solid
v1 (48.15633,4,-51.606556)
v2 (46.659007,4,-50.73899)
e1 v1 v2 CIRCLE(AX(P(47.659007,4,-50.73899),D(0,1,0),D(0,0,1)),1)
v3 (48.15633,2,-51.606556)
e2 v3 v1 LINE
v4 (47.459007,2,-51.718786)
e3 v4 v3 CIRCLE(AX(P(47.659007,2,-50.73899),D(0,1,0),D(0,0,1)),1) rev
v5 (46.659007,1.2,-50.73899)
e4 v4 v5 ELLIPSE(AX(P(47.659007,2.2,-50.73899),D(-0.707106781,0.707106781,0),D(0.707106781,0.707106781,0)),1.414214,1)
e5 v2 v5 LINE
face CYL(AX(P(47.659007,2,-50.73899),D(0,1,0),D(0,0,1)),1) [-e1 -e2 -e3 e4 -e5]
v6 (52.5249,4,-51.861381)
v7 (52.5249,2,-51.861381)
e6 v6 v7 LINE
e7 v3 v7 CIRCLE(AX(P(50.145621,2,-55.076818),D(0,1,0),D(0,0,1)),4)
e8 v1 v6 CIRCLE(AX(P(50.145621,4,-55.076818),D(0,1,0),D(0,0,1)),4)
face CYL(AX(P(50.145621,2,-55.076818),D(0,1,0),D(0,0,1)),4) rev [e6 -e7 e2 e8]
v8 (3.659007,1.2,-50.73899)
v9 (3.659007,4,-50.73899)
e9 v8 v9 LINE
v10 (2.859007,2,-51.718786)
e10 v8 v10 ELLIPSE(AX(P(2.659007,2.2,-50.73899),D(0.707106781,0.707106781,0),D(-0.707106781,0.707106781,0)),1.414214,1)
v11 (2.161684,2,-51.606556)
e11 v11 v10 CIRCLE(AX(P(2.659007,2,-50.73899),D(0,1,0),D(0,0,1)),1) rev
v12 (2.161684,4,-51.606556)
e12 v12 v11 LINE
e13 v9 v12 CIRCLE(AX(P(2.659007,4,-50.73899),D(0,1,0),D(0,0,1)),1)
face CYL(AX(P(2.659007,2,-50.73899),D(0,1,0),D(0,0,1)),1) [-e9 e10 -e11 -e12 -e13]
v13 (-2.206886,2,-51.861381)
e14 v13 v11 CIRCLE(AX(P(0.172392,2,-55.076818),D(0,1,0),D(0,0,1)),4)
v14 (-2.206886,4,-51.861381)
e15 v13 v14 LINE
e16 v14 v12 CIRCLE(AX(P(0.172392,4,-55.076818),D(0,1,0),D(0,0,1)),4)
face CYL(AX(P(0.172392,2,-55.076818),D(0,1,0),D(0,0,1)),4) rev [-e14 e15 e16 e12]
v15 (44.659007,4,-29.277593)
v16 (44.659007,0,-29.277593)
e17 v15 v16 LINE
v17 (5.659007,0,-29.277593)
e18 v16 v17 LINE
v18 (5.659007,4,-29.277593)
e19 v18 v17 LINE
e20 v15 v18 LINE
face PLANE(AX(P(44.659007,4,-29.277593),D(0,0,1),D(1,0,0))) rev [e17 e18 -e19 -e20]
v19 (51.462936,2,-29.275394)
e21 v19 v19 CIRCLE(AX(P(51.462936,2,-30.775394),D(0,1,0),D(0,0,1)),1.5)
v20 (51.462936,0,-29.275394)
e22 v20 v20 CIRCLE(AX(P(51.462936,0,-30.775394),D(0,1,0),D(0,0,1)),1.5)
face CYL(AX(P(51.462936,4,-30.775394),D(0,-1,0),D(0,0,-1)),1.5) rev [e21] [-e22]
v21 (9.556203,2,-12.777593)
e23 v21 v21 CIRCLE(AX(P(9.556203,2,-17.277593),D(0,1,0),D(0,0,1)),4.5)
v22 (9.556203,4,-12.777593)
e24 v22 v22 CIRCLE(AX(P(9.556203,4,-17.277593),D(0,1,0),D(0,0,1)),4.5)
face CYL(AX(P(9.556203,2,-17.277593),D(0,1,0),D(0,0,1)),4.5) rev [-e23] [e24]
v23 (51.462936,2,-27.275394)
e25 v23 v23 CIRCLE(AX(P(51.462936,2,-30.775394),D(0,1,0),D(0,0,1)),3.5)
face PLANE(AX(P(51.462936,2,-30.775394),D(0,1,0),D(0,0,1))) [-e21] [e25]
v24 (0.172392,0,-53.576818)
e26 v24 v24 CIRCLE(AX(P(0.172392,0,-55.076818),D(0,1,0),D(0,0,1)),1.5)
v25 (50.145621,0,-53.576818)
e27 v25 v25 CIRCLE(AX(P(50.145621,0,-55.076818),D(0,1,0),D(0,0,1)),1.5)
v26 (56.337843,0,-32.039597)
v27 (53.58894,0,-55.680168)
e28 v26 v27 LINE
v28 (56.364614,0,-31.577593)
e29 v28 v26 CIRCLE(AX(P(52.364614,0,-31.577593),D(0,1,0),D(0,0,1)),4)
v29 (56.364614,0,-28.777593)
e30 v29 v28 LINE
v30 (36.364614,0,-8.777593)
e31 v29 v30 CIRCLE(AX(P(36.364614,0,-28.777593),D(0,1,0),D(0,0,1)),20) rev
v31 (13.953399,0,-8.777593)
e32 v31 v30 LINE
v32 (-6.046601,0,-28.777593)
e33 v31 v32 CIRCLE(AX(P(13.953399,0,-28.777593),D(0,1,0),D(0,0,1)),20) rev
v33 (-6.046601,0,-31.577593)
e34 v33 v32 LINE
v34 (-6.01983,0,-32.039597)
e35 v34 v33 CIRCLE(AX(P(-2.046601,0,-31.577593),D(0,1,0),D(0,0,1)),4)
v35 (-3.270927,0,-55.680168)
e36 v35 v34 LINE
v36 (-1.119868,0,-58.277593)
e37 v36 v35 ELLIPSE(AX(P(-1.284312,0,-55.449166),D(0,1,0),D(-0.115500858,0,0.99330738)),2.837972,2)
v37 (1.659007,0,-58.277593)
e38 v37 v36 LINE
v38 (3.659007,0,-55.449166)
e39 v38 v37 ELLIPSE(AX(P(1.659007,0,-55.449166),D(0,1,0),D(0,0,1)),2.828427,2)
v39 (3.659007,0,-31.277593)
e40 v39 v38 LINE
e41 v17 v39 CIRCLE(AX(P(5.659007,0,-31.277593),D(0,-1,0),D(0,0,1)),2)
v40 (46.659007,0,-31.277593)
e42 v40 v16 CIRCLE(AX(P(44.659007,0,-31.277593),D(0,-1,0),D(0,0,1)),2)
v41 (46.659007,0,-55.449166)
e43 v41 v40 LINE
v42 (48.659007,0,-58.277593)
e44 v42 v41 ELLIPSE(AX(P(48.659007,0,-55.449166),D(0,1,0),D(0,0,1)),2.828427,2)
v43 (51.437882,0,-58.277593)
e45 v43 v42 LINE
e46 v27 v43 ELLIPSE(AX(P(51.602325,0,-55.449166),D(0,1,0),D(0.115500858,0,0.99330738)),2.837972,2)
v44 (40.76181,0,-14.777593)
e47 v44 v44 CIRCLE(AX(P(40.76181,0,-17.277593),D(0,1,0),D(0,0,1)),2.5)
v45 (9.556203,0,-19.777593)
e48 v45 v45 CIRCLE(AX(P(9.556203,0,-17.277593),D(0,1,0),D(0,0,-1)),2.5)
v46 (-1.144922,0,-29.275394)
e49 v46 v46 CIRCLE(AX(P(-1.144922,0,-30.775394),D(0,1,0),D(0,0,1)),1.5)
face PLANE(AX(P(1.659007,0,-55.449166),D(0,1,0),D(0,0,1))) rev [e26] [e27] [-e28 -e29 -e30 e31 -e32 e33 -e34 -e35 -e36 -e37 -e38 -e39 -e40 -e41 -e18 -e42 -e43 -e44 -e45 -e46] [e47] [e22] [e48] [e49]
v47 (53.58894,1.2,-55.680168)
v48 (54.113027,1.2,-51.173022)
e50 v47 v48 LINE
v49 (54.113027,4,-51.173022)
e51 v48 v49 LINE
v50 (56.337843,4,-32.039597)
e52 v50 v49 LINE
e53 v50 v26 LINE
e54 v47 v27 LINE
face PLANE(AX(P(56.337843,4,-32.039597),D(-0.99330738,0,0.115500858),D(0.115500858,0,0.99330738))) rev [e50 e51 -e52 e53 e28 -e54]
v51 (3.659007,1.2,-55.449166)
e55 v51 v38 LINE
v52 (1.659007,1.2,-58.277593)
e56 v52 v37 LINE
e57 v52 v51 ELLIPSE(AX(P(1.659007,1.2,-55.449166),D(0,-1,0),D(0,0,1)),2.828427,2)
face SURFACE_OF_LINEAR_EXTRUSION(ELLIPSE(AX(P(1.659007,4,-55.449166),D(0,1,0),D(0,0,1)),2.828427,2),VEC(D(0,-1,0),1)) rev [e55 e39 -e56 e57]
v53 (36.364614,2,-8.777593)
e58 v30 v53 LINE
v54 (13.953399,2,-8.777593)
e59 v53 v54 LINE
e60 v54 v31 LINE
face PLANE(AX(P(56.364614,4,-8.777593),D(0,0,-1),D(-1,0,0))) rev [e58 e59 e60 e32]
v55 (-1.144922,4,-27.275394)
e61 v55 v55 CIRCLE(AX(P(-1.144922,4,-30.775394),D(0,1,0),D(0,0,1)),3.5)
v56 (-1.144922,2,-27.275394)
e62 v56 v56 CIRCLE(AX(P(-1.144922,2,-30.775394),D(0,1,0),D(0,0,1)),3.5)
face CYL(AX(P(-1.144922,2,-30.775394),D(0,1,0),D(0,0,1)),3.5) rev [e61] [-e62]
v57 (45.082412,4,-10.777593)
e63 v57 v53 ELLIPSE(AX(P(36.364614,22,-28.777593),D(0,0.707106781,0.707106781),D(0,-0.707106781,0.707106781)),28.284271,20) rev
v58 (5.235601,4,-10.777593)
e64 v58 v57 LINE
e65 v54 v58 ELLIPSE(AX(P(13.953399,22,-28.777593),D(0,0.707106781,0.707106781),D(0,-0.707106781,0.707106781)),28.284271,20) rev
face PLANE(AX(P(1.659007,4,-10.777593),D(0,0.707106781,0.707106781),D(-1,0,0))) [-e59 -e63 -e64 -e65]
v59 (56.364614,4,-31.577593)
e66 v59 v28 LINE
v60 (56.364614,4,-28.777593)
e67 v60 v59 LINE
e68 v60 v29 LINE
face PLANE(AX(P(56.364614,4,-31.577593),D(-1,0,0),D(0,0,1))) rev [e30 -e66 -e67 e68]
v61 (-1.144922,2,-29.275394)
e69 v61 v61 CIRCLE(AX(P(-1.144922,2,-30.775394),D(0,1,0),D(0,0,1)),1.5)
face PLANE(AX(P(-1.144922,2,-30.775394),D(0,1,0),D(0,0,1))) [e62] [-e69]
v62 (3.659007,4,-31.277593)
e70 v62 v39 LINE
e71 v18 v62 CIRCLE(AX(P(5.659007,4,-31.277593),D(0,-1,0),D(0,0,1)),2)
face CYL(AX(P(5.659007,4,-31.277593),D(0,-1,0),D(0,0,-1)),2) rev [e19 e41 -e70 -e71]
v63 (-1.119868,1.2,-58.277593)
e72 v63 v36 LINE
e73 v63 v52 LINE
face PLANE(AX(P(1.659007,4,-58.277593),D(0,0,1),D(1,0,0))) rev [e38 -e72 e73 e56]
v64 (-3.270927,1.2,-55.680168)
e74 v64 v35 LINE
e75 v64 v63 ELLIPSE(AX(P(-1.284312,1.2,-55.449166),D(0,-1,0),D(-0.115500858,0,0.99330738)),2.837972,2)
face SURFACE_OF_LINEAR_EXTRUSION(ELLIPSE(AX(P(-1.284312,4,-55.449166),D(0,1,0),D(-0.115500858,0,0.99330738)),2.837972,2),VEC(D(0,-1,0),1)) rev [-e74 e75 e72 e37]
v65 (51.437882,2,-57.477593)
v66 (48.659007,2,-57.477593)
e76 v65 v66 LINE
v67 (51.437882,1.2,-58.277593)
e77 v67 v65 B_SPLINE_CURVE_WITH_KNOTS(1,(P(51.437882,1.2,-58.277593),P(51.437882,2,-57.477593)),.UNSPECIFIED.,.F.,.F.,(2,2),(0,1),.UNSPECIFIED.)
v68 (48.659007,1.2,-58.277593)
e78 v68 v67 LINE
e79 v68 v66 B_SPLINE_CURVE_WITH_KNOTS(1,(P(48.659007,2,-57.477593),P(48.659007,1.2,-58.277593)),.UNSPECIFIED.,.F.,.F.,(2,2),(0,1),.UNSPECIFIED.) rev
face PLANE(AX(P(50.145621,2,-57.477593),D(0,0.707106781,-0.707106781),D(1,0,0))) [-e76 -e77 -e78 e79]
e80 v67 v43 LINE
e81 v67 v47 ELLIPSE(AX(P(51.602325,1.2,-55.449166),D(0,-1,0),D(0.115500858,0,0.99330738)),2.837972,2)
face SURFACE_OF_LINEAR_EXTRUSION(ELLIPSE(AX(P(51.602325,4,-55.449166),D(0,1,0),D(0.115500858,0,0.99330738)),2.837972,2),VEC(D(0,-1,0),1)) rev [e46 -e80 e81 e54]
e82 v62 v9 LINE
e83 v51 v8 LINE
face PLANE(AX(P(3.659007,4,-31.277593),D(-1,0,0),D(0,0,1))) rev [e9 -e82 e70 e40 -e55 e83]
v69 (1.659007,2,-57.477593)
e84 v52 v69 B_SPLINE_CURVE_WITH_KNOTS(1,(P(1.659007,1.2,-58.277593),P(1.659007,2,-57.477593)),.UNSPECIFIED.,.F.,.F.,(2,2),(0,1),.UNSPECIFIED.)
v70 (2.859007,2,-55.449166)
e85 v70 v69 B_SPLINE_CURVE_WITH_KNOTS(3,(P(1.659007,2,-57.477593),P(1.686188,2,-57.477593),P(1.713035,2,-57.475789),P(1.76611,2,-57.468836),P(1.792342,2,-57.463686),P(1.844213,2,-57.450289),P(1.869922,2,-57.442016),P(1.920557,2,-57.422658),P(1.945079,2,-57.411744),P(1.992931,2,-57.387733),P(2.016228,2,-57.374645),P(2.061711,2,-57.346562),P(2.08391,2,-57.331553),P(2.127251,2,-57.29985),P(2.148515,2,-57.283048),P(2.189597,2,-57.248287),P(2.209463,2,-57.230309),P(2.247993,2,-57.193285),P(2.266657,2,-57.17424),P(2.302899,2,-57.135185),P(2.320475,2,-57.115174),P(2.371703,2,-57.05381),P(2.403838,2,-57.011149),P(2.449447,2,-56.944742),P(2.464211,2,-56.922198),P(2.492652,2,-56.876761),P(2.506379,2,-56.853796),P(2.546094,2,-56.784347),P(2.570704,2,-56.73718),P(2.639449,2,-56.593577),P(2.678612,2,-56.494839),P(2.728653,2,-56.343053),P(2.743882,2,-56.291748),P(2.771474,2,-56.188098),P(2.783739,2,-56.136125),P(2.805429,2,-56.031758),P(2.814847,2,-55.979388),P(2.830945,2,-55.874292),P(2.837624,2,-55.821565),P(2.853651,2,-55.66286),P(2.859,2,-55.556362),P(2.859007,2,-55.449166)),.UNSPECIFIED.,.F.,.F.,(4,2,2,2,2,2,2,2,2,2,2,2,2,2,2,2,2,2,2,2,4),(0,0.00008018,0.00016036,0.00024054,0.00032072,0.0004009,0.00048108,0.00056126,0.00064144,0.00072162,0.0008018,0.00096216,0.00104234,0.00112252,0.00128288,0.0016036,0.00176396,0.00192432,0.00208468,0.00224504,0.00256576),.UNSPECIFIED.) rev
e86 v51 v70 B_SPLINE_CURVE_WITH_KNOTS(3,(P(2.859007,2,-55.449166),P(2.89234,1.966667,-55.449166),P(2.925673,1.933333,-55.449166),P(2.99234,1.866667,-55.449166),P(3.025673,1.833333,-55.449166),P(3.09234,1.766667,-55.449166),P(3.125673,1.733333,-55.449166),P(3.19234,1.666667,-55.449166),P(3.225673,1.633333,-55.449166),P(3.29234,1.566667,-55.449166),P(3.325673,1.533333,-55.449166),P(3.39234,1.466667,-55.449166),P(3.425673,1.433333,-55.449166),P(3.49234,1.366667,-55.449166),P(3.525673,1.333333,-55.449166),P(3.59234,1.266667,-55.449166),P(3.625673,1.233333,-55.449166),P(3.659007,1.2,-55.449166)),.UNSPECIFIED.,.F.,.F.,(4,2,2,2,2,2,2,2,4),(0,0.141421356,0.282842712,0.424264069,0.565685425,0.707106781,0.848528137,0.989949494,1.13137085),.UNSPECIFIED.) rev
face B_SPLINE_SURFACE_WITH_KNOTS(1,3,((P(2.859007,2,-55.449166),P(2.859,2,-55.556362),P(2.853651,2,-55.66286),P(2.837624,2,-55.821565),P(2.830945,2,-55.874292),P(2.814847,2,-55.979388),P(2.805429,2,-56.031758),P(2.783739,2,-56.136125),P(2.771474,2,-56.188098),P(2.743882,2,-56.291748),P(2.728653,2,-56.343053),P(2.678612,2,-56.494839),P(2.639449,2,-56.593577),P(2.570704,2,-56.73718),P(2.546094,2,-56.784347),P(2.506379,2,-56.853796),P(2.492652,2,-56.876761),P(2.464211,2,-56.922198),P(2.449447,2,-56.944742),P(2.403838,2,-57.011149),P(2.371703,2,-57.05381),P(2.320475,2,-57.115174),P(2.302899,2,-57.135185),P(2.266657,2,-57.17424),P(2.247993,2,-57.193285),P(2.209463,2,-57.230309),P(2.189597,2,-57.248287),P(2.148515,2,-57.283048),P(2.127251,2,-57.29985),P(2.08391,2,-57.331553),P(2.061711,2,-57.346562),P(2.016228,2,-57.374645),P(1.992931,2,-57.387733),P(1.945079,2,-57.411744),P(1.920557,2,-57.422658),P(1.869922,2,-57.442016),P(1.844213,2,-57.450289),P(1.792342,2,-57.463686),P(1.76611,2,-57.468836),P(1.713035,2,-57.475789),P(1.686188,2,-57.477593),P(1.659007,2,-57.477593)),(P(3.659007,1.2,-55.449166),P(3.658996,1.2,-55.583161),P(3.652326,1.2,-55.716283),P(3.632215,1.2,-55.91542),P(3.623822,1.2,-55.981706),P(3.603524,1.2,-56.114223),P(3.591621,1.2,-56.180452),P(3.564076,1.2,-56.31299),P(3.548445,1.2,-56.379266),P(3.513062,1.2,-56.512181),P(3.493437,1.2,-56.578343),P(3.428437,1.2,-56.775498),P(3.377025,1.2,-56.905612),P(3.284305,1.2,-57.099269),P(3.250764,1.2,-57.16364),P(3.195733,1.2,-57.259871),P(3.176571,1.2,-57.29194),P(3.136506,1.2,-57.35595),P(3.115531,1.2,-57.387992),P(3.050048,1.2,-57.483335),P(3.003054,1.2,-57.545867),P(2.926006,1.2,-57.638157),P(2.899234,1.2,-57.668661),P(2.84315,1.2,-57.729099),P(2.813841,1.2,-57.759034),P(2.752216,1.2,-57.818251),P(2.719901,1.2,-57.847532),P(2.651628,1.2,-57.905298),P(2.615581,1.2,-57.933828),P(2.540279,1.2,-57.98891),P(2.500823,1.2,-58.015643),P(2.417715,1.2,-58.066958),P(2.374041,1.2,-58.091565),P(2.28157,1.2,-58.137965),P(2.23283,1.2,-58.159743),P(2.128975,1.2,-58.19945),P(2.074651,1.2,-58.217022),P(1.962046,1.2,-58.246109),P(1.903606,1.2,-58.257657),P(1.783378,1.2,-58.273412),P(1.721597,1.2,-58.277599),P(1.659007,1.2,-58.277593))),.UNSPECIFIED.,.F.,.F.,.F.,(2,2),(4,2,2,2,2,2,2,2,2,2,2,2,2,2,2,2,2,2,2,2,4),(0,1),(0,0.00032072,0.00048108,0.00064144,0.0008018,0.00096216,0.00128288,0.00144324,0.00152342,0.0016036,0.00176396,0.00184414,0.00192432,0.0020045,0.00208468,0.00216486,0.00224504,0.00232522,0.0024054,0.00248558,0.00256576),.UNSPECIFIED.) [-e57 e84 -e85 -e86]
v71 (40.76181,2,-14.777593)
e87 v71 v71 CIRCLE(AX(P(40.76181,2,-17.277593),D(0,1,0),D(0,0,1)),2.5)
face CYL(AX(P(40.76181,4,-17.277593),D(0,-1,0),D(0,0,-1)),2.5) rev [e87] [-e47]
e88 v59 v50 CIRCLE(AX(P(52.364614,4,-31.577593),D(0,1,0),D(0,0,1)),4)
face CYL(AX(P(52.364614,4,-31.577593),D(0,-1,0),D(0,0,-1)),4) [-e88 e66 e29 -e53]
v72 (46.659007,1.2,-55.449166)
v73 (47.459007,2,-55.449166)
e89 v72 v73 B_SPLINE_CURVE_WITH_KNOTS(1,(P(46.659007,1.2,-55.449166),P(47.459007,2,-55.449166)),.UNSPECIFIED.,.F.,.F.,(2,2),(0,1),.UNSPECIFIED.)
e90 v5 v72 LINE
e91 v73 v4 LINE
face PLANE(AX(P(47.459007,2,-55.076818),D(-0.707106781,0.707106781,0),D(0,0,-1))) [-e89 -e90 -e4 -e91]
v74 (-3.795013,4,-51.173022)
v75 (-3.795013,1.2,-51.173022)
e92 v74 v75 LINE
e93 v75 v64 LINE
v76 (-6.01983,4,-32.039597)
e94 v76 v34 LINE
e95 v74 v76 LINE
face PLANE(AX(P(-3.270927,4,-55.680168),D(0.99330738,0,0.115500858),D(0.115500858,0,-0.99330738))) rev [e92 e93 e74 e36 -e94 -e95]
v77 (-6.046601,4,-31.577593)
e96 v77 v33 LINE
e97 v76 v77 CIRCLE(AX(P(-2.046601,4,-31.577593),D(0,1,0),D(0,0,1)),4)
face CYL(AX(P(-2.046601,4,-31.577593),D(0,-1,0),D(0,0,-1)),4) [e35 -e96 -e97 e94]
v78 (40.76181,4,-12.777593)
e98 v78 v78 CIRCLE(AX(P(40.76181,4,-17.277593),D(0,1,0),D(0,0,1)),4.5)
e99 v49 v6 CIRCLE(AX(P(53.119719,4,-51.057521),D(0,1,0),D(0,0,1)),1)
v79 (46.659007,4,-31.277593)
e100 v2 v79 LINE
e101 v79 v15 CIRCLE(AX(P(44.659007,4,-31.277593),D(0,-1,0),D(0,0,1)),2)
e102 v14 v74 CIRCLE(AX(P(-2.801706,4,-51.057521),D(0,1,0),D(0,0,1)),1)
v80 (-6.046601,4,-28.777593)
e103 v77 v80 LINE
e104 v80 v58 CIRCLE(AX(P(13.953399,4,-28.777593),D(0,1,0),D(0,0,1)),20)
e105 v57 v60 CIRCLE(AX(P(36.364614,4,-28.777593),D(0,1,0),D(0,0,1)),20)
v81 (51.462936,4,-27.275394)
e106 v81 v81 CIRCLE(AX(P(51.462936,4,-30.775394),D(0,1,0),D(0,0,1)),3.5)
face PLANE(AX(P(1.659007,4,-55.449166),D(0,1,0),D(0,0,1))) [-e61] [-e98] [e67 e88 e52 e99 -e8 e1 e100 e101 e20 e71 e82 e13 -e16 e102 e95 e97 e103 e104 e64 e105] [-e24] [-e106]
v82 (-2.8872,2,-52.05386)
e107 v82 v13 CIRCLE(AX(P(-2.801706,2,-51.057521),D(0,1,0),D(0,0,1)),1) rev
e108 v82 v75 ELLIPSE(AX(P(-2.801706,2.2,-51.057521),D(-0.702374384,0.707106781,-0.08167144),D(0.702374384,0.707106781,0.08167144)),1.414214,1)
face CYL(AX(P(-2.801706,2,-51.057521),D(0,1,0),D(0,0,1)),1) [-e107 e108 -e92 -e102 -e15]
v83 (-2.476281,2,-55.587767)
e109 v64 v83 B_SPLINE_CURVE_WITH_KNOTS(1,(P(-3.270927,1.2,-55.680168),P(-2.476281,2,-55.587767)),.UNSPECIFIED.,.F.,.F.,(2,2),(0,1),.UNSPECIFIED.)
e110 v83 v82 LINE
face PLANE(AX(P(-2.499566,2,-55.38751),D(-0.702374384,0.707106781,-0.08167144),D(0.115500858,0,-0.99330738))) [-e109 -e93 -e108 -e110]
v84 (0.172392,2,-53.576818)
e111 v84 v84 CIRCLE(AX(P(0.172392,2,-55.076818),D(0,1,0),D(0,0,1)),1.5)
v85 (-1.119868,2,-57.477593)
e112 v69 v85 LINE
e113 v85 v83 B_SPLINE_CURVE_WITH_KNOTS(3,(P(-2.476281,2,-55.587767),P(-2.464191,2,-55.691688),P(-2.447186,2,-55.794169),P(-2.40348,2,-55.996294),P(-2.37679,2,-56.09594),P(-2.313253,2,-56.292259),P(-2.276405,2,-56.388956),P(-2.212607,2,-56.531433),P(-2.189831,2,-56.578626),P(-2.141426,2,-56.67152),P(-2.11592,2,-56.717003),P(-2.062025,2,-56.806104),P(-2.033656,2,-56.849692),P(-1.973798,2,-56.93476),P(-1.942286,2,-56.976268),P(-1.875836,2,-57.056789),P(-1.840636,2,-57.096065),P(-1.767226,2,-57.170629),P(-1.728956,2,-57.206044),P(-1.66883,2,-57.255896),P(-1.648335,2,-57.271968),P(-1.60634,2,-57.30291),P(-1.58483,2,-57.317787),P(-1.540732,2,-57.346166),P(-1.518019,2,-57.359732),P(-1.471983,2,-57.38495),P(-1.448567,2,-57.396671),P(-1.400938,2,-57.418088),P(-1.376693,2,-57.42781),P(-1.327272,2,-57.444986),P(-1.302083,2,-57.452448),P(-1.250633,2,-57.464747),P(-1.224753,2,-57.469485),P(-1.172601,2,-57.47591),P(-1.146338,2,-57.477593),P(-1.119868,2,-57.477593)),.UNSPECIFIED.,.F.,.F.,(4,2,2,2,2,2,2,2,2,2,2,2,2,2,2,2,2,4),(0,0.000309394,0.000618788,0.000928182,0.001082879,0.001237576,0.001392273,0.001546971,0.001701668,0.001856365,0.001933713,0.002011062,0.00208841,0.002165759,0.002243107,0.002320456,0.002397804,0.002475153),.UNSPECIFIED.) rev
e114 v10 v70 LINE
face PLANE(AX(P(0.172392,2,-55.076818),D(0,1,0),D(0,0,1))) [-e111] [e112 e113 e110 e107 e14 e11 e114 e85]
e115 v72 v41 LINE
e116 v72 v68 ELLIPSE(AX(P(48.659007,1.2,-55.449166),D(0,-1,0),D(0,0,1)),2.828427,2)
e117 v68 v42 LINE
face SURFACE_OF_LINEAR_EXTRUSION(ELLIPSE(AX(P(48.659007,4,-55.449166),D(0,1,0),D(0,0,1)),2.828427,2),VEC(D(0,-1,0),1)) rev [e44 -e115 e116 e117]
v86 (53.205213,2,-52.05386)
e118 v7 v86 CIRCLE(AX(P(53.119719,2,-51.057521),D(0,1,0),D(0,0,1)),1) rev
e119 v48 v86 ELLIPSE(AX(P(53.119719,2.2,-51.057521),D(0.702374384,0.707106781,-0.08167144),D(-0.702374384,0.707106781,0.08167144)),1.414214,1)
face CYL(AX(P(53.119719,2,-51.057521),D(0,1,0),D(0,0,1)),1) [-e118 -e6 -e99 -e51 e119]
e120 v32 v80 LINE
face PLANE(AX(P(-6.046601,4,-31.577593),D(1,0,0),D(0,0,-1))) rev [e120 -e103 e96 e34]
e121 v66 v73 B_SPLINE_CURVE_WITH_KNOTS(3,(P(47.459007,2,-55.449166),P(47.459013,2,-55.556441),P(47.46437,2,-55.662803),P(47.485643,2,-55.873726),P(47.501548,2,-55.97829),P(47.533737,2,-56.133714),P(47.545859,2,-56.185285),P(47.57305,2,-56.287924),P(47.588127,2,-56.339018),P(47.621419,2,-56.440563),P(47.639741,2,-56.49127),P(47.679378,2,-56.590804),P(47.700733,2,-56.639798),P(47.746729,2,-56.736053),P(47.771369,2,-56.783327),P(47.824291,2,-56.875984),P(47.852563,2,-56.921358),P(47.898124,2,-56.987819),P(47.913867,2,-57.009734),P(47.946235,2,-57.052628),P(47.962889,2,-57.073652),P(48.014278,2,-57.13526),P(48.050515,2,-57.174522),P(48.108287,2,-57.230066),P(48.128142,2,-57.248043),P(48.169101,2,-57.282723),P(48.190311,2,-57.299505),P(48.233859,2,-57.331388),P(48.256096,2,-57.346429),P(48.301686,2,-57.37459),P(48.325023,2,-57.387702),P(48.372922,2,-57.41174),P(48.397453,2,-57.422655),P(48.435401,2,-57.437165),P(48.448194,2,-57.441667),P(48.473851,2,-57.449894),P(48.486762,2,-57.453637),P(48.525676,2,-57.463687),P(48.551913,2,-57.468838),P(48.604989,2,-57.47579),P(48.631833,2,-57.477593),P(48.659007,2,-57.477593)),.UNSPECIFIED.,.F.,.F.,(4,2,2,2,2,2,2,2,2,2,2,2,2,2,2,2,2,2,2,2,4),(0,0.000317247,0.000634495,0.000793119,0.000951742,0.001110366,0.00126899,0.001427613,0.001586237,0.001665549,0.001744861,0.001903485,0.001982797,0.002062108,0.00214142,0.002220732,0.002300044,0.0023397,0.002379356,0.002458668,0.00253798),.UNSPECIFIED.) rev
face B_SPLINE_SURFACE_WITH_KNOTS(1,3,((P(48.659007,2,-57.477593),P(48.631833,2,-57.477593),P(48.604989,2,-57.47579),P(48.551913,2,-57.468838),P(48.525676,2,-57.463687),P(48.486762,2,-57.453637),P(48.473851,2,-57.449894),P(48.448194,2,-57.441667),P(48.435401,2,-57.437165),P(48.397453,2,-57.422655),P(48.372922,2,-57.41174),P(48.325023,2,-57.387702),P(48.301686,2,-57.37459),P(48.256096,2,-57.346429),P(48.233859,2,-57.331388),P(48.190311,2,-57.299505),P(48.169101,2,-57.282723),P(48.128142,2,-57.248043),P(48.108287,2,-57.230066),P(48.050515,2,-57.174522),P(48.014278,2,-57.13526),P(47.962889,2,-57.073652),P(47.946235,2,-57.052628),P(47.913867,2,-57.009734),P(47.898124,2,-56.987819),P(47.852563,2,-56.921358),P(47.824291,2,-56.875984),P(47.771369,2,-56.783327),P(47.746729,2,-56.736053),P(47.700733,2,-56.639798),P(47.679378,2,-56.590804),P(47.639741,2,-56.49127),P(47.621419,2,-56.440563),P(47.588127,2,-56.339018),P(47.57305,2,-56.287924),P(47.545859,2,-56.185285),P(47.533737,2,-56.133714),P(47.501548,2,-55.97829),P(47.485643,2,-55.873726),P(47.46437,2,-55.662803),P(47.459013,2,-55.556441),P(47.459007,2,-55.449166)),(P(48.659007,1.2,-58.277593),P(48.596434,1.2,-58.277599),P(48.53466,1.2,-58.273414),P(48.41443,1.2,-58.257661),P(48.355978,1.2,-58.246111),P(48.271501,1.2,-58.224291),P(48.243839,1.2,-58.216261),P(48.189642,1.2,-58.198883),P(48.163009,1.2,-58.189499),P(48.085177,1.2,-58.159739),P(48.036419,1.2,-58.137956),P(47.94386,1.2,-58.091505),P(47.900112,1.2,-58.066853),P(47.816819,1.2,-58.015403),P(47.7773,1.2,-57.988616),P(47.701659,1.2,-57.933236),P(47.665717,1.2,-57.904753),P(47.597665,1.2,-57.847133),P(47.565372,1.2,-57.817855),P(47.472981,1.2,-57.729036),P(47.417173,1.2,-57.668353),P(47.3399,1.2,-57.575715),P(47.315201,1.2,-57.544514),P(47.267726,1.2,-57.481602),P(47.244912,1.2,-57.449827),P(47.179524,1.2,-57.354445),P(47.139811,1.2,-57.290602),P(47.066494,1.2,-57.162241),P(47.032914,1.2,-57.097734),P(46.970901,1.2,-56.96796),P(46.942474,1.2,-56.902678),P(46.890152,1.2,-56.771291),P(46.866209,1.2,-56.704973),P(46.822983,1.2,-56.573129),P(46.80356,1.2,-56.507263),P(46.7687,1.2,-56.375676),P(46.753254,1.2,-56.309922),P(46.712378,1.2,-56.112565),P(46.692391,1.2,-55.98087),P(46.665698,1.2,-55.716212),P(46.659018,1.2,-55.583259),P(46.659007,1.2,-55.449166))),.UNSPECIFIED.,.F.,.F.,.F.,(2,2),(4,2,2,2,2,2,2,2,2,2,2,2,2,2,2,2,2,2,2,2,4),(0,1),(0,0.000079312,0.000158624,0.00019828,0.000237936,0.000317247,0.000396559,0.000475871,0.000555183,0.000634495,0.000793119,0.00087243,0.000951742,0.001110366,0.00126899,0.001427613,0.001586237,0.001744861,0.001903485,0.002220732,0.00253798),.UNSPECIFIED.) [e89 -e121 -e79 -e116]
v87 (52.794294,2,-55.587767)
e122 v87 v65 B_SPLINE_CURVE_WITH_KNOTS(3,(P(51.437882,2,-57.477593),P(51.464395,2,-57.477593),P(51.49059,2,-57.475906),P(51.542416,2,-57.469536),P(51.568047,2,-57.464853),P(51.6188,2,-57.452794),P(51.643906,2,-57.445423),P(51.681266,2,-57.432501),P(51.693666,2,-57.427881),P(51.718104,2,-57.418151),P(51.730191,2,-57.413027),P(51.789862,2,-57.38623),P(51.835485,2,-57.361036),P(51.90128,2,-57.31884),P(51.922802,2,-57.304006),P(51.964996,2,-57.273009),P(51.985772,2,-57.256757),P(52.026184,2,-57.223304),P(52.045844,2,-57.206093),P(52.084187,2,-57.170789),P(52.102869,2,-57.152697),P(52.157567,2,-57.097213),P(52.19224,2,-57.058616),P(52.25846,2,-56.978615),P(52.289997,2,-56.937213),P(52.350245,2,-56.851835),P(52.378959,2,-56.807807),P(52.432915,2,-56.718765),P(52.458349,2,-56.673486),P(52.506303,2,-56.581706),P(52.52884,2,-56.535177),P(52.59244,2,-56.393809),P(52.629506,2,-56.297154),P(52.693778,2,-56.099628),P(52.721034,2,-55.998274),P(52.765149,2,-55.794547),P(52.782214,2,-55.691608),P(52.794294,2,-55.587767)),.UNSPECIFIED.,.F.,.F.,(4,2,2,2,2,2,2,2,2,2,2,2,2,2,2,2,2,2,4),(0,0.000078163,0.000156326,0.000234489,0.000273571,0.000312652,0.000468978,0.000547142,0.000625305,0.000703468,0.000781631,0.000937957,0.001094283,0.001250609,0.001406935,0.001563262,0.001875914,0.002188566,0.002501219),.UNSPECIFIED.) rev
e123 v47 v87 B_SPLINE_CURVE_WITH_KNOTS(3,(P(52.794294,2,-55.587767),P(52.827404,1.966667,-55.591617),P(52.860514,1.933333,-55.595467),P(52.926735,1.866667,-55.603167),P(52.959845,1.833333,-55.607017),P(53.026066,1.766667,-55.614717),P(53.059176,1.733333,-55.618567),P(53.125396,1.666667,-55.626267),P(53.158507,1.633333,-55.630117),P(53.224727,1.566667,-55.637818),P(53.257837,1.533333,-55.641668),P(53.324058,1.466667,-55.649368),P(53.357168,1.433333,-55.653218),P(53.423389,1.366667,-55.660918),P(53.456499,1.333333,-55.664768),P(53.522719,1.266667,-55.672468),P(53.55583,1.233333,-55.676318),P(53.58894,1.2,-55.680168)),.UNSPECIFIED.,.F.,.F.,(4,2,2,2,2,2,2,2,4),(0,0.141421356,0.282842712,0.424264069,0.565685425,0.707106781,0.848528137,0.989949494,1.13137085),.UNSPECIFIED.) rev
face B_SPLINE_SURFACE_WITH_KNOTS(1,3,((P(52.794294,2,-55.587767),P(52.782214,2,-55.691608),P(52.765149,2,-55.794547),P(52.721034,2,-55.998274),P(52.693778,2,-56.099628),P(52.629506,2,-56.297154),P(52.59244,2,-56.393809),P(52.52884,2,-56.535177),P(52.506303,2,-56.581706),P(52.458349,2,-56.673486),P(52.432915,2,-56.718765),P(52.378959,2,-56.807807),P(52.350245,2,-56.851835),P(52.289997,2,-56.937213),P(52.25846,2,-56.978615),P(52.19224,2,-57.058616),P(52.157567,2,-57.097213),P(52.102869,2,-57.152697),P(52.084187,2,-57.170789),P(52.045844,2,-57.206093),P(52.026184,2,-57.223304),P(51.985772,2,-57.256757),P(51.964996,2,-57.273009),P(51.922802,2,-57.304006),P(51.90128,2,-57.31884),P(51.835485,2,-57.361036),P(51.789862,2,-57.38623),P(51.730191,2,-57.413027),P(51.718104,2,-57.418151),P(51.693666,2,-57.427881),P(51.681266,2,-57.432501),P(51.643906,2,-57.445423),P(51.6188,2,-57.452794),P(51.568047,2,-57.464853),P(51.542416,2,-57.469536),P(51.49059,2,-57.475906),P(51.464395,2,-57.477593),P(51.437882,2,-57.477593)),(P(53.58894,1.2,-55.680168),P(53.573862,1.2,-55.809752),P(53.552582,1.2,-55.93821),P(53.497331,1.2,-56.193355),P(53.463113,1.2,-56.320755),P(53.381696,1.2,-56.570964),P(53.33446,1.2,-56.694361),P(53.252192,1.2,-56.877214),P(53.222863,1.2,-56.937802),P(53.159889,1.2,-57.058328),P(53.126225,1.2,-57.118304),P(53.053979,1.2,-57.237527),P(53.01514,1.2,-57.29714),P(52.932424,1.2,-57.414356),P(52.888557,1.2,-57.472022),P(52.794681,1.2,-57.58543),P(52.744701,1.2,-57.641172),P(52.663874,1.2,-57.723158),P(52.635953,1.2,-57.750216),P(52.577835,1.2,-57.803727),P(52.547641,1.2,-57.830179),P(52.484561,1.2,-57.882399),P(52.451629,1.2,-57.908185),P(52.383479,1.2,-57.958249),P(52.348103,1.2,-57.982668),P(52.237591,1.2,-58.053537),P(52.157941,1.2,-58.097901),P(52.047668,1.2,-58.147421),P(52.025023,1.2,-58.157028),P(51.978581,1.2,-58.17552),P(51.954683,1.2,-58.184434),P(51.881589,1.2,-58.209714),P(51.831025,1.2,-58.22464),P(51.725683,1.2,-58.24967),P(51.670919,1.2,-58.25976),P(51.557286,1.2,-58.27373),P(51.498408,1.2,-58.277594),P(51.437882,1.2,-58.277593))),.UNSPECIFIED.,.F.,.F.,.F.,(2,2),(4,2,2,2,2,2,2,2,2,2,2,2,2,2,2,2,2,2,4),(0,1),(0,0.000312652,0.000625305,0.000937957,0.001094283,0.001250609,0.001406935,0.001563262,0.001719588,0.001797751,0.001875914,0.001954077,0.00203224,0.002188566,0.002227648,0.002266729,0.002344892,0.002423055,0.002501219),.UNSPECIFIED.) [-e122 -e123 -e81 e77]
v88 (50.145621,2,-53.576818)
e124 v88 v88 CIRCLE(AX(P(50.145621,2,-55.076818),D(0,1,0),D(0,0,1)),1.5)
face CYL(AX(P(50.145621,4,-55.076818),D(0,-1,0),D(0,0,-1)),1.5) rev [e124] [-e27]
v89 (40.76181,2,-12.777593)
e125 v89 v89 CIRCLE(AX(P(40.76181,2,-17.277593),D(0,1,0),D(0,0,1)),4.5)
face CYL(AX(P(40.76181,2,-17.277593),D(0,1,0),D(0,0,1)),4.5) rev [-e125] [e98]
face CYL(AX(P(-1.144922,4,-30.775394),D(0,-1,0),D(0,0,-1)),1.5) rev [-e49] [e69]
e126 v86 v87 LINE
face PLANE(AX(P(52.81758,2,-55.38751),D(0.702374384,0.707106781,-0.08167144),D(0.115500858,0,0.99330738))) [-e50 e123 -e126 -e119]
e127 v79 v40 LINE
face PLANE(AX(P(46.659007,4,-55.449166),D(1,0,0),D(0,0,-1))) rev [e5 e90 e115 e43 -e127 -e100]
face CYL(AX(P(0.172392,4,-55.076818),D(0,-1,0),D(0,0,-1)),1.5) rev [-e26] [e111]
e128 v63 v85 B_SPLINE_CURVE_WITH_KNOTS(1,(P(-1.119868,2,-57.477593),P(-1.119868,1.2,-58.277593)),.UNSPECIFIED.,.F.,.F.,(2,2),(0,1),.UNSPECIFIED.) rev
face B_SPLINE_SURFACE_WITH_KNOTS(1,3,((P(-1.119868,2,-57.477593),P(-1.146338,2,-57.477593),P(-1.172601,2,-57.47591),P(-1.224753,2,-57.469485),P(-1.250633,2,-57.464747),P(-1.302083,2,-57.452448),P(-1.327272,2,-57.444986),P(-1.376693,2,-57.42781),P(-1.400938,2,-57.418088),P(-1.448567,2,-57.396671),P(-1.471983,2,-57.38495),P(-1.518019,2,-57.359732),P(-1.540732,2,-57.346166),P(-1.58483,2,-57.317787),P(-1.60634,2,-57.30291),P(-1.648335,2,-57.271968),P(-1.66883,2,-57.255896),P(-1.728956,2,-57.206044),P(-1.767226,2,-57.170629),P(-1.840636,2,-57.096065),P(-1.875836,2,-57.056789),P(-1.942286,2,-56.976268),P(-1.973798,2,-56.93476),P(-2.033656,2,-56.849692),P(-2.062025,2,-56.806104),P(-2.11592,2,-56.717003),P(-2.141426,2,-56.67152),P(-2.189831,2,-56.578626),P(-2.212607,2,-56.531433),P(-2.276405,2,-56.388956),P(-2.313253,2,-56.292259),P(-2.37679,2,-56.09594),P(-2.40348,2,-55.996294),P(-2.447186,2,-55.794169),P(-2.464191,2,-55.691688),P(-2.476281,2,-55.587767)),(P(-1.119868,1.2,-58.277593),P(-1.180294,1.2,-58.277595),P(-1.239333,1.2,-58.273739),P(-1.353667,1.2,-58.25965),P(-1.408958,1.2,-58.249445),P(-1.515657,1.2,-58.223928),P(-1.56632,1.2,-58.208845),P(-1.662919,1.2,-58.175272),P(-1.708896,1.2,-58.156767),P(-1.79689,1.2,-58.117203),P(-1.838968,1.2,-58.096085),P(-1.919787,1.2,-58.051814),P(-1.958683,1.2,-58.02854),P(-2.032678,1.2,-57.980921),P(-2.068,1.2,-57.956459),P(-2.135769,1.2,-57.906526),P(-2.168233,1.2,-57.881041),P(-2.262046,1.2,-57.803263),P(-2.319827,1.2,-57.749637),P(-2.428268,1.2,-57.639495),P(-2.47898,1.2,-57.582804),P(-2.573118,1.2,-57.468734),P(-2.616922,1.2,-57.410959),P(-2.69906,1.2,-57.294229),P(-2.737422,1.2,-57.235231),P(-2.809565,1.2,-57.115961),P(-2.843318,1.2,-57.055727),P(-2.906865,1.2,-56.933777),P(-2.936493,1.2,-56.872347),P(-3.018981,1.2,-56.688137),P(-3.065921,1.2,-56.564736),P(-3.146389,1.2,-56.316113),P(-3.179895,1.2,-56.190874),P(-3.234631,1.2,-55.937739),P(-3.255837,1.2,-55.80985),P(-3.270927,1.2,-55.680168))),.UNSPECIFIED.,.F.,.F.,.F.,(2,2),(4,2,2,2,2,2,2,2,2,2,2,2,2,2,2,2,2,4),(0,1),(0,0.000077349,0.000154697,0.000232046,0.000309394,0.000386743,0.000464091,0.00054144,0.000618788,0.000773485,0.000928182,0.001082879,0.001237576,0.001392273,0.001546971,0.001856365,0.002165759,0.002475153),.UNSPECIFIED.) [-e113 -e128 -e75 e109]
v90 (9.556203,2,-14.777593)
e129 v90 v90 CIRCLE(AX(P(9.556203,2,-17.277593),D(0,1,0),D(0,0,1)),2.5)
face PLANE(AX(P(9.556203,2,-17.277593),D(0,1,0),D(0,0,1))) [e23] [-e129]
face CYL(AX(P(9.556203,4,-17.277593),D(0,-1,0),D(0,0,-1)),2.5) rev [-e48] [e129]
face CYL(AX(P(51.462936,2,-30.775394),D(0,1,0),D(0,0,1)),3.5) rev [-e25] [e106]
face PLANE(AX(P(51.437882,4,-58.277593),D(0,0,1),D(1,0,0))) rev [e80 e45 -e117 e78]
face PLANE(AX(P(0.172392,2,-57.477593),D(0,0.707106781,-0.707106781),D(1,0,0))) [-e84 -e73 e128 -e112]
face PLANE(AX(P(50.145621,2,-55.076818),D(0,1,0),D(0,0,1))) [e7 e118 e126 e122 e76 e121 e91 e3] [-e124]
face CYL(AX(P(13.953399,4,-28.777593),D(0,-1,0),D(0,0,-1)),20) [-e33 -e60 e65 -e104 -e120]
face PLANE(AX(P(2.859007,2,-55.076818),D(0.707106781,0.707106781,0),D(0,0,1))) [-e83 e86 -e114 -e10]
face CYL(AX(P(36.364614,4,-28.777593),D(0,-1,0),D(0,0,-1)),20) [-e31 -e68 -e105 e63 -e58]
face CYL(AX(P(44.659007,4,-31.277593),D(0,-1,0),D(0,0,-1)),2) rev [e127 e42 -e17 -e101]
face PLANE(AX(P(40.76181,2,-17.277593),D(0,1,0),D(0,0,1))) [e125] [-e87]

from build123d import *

# Parameters (mm, degrees)
SZKIC1_R                    = 1.5
SZKIC1_R_2                  = 2.5
DODANIE_WYCI_GNI_CIE1_DEPTH = 4
ZAOKR_GLENIE1_R             = 20
SZKIC2_R                    = 3.5
SZKIC2_R_2                  = 4
SZKIC2_R_3                  = 4.5
WYTNIJ_WYCI_GNI_CIE1_DEPTH  = 2
ZAOKR_GLENIE2_R             = 1
SFAZOWANIE2_SIZE            = 0.8


with BuildPart() as part:
    # Szkic1 → Dodanie-wyciągnięcie1 (new body)
    with BuildSketch(Plane(origin=(0, 0, 0), x_dir=(1, 0, 0), z_dir=(0, 1, 0))):
        with BuildLine():
            Line((1.659006671, 58.277593275), (-1.119868317, 58.277593275))
            add(Edge.make_bspline(
                [(-1.119868317, 58.277593275), (-2.968900305, 58.277593275), (-3.270926516, 55.680167866)],
                knots=[3.223355162, 3.223355162, 3.223355162, 4.71238898, 4.71238898, 4.71238898], degree=2, weights=[1, 0.735415338, 1]))
            Line((-3.270926516, 55.680167866), (-6.019830139, 32.039596707))
            ThreePointArc((-6.019830139, 32.039596707), (-6.039902389, 31.808982465), (-6.046600617, 31.577593275))
            Line((-6.046600617, 31.577593275), (-6.046600617, 8.777593275))
            Line((-6.046600617, 8.777593275), (56.36461396, 8.777593275))
            Line((56.36461396, 8.777593275), (56.36461396, 31.577593275))
            ThreePointArc((56.36461396, 31.577593275), (56.357915732, 31.808982465), (56.337843482, 32.039596707))
            Line((56.337843482, 32.039596707), (53.588939858, 55.680167866))
            add(Edge.make_bspline(
                [(53.588939858, 55.680167866), (53.286913648, 58.277593275), (51.43788166, 58.277593275)],
                knots=[1.570796327, 1.570796327, 1.570796327, 3.059830145, 3.059830145, 3.059830145], degree=2, weights=[1, 0.735415338, 1]))
            Line((51.43788166, 58.277593275), (48.659006671, 58.277593275))
            add(Edge.make_bspline(
                [(48.659006671, 58.277593275), (46.659006671, 58.277593275), (46.659006671, 55.44916615)],
                knots=[3.141592654, 3.141592654, 3.141592654, 4.71238898, 4.71238898, 4.71238898], degree=2, weights=[1, 0.707106781, 1]))
            Line((46.659006671, 55.44916615), (46.659006671, 31.277593275))
            ThreePointArc((46.659006671, 31.277593275), (46.073220234, 29.863379712), (44.659006671, 29.277593275))
            Line((44.659006671, 29.277593275), (5.659006671, 29.277593275))
            ThreePointArc((5.659006671, 29.277593275), (4.244793109, 29.863379712), (3.659006671, 31.277593275))
            Line((3.659006671, 31.277593275), (3.659006671, 55.44916615))
            add(Edge.make_bspline(
                [(3.659006671, 55.44916615), (3.659006671, 58.277593275), (1.659006671, 58.277593275)],
                knots=[1.570796327, 1.570796327, 1.570796327, 3.141592654, 3.141592654, 3.141592654], degree=2, weights=[1, 0.707106781, 1]))
        make_face()
        with Locations(Location((50.145621432, 55.076817676, 0), (0, 0, 270))):
            Circle(SZKIC1_R, mode=Mode.SUBTRACT)
        with Locations(Location((0.172391911, 55.076817676, 0), (0, 0, 270))):
            Circle(SZKIC1_R, mode=Mode.SUBTRACT)
        with Locations(Location((-1.144922446, 30.775394297, 0), (0, 0, 270))):
            Circle(SZKIC1_R, mode=Mode.SUBTRACT)
        with Locations(Location((51.462935789, 30.775394297, 0), (0, 0, 270))):
            Circle(SZKIC1_R, mode=Mode.SUBTRACT)
        with Locations(Location((40.761810316, 17.277593275, 0), (0, 0, 270))):
            Circle(SZKIC1_R_2, mode=Mode.SUBTRACT)
        with Locations(Location((9.556203027, 17.277593275, 0), (0, 0, 90))):
            Circle(SZKIC1_R_2, mode=Mode.SUBTRACT)
    extrude(amount=DODANIE_WYCI_GNI_CIE1_DEPTH)

    # Zaokrąglenie1
    zaokr_glenie1_edges = [part.edges().sort_by_distance(p)[0] for p in [
        (56.36461396, 2, -8.777593275),
        (-6.046600617, 2, -8.777593275),
    ]]
    fillet(zaokr_glenie1_edges, radius=ZAOKR_GLENIE1_R)

    # Szkic2 → Wytnij-wyciągnięcie1 (cut)
    with BuildSketch(Plane(origin=(0, 4, 0), x_dir=(1, 0, 0), z_dir=(0, 1, 0))):
        with Locations(Location((51.462935789, 30.775394297, 0), (0, 0, 270))):
            Circle(SZKIC2_R)
        with Locations((50.145621432, 55.076817676)):
            Circle(SZKIC2_R_2)
        with Locations((0.172391911, 55.076817676)):
            Circle(SZKIC2_R_2)
        with Locations(Location((-1.144922446, 30.775394297, 0), (0, 0, 270))):
            Circle(SZKIC2_R)
        with Locations(Location((9.556203027, 17.277593275, 0), (0, 0, 270))):
            Circle(SZKIC2_R_3)
        with Locations(Location((40.761810316, 17.277593275, 0), (0, 0, 270))):
            Circle(SZKIC2_R_3)
    extrude(amount=-WYTNIJ_WYCI_GNI_CIE1_DEPTH, mode=Mode.SUBTRACT)

    # Zaokrąglenie2
    zaokr_glenie2_edges = [part.edges().sort_by_distance(p)[0] for p in [
        (53.837974946, 3, -53.538466114),
        (-3.519961603, 3, -53.538466114),
        (3.659006671, 3, -53.116328576),
        (46.659006671, 3, -53.116328576),
    ]]
    fillet(zaokr_glenie2_edges, radius=ZAOKR_GLENIE2_R)

    # Sfazowanie1
    # the kernel refuses this chamfer: 2 mm, written as the material it takes off along each edge
    with BuildSketch(Plane(origin=(1.60932104, 4, -8.777593275), x_dir=(0, 0.027495876610586487, -0.9996219169112968), z_dir=(1, 0, 0))) as sfazowanie1_piece_1:
        with BuildLine():
            Line((2.05734639, 0), (-0.11309431, -2.054235587))
            Line((-0.11309431, -2.054235587), (-0.153079186, -2.053135752))
            ThreePointArc((-0.153079186, -2.053135752), (-0.068258454, -1.026795659), (-0.039984877, 0.001099835))
            Line((-0.039984877, 0.001099835), (0.001099835, 0.039984877))
            ThreePointArc((0.001099835, 0.039984877), (1.028995329, 0.011711299), (2.058446225, 0.039984877))
            Line((2.058446225, 0.039984877), (2.05734639, 0))
        make_face()
    extrude(amount=47.099371262, mode=Mode.SUBTRACT)

    # Sfazowanie2
    sfazowanie2_edges = [part.edges().sort_by_distance(p)[0] for p in [
        (3.659006671, 2, -53.094078185),
        (-3.532969865, 2, -53.426595059),
        (3.185598698, 2, -57.276468397),
        (-2.638843717, 2, -57.379483489),
        (0.269569177, 2, -58.277593275),
        (53.850983208, 2, -53.426595059),
        (46.659006671, 2, -53.094078185),
        (52.95685706, 2, -57.37948349),
        (47.132414645, 2, -57.276468396),
        (50.048444166, 2, -58.277593275),
    ]]
    chamfer(sfazowanie2_edges, length=SFAZOWANIE2_SIZE)


solid = part.part
